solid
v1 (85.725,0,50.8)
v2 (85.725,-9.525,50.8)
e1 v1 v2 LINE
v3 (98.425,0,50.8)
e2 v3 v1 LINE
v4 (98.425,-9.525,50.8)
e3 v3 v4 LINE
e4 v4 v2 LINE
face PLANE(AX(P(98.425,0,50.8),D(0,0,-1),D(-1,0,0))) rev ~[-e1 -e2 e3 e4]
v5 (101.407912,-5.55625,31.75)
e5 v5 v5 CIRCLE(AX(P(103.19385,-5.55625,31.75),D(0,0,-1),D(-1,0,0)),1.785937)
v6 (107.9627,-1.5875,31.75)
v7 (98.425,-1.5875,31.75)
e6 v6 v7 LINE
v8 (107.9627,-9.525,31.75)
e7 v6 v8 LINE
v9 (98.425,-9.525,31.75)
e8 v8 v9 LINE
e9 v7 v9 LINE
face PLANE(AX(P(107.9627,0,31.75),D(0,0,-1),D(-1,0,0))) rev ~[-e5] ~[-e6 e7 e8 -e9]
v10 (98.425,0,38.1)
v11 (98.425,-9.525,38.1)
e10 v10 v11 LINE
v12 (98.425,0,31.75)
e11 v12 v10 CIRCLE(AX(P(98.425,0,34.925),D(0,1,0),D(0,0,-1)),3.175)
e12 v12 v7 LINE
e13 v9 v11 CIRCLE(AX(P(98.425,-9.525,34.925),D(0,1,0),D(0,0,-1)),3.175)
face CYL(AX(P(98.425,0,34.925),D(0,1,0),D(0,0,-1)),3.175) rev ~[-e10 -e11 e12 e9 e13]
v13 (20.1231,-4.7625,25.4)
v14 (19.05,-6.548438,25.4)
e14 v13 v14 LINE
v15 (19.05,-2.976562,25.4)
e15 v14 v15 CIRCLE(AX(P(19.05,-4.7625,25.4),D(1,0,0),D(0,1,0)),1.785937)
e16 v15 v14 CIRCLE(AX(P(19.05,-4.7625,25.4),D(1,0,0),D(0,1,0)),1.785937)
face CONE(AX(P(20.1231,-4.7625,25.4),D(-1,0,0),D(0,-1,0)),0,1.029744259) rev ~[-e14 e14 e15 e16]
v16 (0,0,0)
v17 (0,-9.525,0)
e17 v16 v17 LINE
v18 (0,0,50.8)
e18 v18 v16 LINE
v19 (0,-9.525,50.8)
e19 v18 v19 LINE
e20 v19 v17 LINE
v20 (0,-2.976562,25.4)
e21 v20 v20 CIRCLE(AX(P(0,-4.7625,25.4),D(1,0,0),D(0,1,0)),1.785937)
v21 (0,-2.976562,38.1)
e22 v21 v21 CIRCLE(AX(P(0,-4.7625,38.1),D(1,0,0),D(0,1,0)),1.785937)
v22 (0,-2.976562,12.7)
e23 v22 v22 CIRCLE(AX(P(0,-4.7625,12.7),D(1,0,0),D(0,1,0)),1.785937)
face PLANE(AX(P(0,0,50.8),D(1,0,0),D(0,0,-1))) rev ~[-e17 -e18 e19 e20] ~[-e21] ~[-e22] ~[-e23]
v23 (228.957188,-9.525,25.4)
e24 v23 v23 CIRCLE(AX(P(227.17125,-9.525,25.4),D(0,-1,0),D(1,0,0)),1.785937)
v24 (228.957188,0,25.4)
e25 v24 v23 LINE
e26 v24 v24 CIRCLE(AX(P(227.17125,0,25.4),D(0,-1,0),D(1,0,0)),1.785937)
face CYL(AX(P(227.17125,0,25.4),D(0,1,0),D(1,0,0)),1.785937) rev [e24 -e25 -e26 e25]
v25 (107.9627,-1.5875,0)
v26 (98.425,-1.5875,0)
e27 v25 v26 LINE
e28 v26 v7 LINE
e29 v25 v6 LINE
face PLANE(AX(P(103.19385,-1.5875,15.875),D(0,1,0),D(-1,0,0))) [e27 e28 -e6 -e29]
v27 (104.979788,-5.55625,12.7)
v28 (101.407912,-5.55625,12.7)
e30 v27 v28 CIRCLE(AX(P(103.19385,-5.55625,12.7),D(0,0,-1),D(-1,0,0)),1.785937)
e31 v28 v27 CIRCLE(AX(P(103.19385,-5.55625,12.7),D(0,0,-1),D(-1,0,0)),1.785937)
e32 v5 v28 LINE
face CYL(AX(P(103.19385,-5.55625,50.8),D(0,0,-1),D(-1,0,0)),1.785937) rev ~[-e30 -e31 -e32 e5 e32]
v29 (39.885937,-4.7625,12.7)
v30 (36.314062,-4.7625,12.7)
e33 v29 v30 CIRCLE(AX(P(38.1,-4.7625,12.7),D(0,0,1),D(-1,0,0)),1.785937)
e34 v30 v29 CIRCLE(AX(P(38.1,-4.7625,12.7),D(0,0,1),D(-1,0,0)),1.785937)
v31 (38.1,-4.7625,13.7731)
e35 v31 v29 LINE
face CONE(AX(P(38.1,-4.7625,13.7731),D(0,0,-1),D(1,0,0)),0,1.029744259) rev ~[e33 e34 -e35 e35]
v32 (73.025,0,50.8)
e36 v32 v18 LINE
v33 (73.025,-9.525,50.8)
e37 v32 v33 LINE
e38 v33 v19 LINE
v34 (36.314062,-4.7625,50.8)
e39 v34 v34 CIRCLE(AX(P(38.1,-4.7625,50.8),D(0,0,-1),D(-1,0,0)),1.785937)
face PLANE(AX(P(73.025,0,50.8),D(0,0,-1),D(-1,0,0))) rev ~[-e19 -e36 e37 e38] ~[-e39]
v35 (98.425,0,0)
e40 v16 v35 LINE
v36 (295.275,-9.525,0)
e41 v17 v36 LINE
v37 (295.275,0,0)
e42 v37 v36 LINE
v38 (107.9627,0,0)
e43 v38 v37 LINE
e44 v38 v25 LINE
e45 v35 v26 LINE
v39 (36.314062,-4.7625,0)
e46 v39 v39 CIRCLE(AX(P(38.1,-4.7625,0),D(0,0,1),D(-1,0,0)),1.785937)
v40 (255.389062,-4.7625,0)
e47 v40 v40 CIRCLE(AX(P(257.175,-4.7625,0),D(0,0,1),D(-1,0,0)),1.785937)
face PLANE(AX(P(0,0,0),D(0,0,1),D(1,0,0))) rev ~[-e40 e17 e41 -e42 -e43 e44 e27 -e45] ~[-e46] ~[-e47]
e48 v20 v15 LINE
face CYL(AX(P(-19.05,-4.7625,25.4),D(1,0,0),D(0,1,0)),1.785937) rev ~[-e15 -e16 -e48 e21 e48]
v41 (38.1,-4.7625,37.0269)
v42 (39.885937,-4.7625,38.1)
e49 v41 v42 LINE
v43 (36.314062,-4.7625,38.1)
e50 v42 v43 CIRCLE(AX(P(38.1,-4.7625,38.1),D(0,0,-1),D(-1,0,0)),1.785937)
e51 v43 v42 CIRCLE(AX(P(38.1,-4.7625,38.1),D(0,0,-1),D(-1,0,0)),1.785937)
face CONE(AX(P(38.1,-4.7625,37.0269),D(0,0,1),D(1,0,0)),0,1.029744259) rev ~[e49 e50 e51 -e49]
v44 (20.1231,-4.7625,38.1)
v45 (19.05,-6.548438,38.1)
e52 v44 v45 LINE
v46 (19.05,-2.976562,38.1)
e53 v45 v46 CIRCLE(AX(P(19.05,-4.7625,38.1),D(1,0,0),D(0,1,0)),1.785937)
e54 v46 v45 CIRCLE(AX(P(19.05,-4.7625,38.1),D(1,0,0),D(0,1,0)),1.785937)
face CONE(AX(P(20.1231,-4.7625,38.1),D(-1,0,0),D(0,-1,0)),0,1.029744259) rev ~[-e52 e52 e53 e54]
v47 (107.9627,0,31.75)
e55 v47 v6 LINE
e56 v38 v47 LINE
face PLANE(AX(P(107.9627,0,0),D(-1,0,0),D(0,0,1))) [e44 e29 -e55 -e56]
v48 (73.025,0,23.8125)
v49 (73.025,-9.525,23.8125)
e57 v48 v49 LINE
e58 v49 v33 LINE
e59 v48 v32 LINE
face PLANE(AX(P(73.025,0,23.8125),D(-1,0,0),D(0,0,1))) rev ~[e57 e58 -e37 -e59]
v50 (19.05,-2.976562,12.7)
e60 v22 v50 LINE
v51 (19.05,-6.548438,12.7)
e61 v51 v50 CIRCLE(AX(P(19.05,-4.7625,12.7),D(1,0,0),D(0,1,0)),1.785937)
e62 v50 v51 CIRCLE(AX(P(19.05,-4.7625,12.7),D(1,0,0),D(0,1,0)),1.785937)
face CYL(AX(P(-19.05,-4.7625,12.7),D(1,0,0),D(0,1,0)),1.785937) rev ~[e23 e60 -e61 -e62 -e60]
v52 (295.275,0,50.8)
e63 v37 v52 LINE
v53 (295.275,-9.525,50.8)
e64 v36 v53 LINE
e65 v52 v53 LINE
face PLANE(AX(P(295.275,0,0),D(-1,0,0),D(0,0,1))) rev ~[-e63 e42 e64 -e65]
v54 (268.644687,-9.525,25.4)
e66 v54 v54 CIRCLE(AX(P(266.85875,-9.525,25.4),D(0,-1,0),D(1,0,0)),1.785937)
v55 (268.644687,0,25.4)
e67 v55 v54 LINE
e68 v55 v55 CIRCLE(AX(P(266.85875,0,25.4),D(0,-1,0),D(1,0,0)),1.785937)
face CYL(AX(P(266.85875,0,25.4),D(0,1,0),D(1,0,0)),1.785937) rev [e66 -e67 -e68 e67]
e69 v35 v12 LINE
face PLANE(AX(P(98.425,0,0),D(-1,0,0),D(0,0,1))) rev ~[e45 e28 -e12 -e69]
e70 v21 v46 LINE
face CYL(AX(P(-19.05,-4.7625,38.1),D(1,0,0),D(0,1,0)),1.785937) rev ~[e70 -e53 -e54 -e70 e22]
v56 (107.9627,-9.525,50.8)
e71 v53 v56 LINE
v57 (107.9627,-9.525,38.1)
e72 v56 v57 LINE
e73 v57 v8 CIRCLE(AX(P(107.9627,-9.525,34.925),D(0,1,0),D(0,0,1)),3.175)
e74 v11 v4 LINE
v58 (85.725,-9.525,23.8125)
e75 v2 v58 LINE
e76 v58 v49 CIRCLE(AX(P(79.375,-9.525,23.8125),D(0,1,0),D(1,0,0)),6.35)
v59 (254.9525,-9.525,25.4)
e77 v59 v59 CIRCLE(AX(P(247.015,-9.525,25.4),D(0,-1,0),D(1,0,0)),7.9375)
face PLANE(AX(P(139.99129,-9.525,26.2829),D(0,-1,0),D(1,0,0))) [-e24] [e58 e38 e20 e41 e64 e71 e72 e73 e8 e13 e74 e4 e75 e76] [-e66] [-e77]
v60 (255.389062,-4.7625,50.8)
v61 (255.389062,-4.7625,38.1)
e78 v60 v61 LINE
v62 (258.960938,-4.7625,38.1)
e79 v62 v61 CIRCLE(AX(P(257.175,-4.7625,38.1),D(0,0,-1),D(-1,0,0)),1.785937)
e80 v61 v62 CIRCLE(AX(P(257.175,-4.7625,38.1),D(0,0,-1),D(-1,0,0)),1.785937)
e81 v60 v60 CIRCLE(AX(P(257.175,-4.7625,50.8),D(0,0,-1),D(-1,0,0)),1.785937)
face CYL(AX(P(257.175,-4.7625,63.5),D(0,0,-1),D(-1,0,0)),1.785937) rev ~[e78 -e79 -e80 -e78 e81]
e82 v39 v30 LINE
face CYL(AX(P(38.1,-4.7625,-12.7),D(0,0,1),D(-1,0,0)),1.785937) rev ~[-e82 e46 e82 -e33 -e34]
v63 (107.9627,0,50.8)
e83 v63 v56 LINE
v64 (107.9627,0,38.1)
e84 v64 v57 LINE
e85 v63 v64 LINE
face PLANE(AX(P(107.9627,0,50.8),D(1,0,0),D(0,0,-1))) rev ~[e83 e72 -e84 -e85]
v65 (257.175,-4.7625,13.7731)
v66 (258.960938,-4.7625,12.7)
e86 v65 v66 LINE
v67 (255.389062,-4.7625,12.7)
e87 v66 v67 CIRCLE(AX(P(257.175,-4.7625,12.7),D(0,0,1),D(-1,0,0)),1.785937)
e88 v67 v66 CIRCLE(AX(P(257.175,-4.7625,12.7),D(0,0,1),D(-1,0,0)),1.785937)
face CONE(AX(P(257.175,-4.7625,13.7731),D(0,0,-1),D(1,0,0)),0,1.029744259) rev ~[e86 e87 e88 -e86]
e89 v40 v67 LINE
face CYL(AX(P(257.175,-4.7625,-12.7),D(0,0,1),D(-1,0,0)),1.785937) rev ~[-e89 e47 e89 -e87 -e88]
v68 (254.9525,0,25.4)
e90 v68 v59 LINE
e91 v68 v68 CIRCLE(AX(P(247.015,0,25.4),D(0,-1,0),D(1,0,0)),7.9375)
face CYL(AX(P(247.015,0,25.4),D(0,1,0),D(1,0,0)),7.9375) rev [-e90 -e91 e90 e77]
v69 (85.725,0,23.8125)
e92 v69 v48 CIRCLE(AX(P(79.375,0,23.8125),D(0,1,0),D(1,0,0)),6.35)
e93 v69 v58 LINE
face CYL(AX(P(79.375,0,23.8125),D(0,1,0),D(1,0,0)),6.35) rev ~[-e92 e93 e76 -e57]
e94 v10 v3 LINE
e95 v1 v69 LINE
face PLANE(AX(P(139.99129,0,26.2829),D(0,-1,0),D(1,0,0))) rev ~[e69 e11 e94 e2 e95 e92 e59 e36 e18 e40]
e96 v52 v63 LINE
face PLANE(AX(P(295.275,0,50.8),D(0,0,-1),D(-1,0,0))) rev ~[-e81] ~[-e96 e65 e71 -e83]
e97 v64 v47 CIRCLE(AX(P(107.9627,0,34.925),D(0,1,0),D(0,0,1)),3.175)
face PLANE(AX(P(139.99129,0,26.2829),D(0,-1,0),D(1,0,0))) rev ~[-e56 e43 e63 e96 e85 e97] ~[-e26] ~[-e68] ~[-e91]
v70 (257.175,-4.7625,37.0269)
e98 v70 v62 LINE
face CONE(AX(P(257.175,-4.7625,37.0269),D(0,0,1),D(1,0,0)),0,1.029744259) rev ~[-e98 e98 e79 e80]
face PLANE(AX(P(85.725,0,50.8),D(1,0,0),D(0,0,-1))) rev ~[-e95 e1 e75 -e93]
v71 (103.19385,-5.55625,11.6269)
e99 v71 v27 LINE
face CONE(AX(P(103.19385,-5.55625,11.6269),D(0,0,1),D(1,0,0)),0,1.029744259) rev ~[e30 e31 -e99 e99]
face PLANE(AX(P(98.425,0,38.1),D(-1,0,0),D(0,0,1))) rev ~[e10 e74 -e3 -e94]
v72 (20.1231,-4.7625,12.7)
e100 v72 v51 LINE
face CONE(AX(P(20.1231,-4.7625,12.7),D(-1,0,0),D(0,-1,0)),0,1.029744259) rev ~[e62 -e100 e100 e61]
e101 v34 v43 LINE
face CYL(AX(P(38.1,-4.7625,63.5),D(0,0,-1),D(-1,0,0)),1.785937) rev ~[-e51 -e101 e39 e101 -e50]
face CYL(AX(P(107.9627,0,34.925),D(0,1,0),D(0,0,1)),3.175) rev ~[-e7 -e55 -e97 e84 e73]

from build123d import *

# Parameters (mm, degrees)
F0_R             = 1.7859375
F0_R_2           = 7.9375
F1_DEPTH         = 9.525
F2_W             = 9.5377
F2_H             = 31.75
F3_DEPTH         = 1.5875
F5_D             = 3.571875
F5_DEPTH         = 19.05
F5_TIP           = 1.0730995118
F7_D             = 3.571875
F7_DEPTH         = 19.05
F7_TIP           = 1.0730995118
F11_D            = 3.571875
F11_DEPTH        = 12.7
F11_TIP          = 1.0730995118
F11_ON_F9_D      = 3.571875
F11_ON_F9_DEPTH  = 12.7
F11_ON_F9_TIP    = 1.0730995118
F11_ON_F10_D     = 3.571875
F11_ON_F10_DEPTH = 12.7
F11_ON_F10_TIP   = 1.0730995118


# Not quite as in the source:
# - a feature names something its author has since deleted; it is built from what else it names


with BuildPart() as f1:
    # F0 (on Front) → F1 (new body)
    with BuildSketch(Plane.XZ):
        with BuildLine():
            Line((0, 50.8), (0, 0))
            Line((0, 0), (295.275, 0))
            Line((295.275, 0), (295.275, 50.8))
            Line((295.275, 50.8), (107.9627, 50.8))
            Line((107.9627, 50.8), (107.9627, 38.1))
            ThreePointArc((107.9627, 38.1), (111.1377, 34.925), (107.9627, 31.75))
            Line((107.9627, 31.75), (98.425, 31.75))
            ThreePointArc((98.425, 31.75), (95.25, 34.925), (98.425, 38.1))
            Line((98.425, 38.1), (98.425, 50.8))
            Line((98.425, 50.8), (85.725, 50.8))
            Line((85.725, 50.8), (85.725, 23.8125))
            ThreePointArc((85.725, 23.8125), (79.375, 17.4625), (73.025, 23.8125))
            Line((73.025, 23.8125), (73.025, 50.8))
            Line((73.025, 50.8), (0, 50.8))
        make_face()
        with Locations((227.17125, 25.4)):
            Circle(F0_R, mode=Mode.SUBTRACT)
        with Locations((247.015, 25.4)):
            Circle(F0_R_2, mode=Mode.SUBTRACT)
        with Locations((266.85875, 25.4)):
            Circle(F0_R, mode=Mode.SUBTRACT)
    extrude(amount=F1_DEPTH)

    # F2 (on face) → F3 (cut)
    with BuildSketch(Plane(origin=(0, 0, 0), x_dir=(-1, 0, 0), z_dir=(0, 1, 0))):
        with Locations((-103.19385, 15.875)):
            Rectangle(F2_W, F2_H)
    extrude(amount=-F3_DEPTH, mode=Mode.SUBTRACT)

    # F5
    with Locations(Plane(origin=(0, 0, 0), x_dir=(0, -1, 0), z_dir=(-1, 0, 0))):
        with Locations((4.7625, 38.1), (4.7625, 25.4), (4.7625, 12.7)):
            Hole(F5_D / 2, depth=F5_DEPTH)
            with Locations((0, 0, -(F5_DEPTH + F5_TIP / 2))):  # 118° drill point
                Cone(0, F5_D / 2, F5_TIP, mode=Mode.SUBTRACT)

    # F7
    with Locations(Plane.XY.offset(31.75)):
        with Locations((103.19385, -5.55625)):
            Hole(F7_D / 2, depth=F7_DEPTH)
            with Locations((0, 0, -(F7_DEPTH + F7_TIP / 2))):  # 118° drill point
                Cone(0, F7_D / 2, F7_TIP, mode=Mode.SUBTRACT)

    # F11
    with Locations(Plane.XY.offset(50.8)):
        with Locations((257.175, -4.7625)):
            Hole(F11_D / 2, depth=F11_DEPTH)
            with Locations((0, 0, -(F11_DEPTH + F11_TIP / 2))):  # 118° drill point
                Cone(0, F11_D / 2, F11_TIP, mode=Mode.SUBTRACT)

    # F11 on F9
    with Locations(Plane.XY.offset(50.8)):
        with Locations((38.1, -4.7625)):
            Hole(F11_ON_F9_D / 2, depth=F11_ON_F9_DEPTH)
            with Locations((0, 0, -(F11_ON_F9_DEPTH + F11_ON_F9_TIP / 2))):  # 118° drill point
                Cone(0, F11_ON_F9_D / 2, F11_ON_F9_TIP, mode=Mode.SUBTRACT)

    # F11 on F10
    with Locations(Plane(origin=(0, 0, 0), x_dir=(1, 0, 0), z_dir=(0, 0, -1))):
        with Locations((38.1, 4.7625), (257.175, 4.7625)):
            Hole(F11_ON_F10_D / 2, depth=F11_ON_F10_DEPTH)
            with Locations((0, 0, -(F11_ON_F10_DEPTH + F11_ON_F10_TIP / 2))):  # 118° drill point
                Cone(0, F11_ON_F10_D / 2, F11_ON_F10_TIP, mode=Mode.SUBTRACT)


solid = f1.part
